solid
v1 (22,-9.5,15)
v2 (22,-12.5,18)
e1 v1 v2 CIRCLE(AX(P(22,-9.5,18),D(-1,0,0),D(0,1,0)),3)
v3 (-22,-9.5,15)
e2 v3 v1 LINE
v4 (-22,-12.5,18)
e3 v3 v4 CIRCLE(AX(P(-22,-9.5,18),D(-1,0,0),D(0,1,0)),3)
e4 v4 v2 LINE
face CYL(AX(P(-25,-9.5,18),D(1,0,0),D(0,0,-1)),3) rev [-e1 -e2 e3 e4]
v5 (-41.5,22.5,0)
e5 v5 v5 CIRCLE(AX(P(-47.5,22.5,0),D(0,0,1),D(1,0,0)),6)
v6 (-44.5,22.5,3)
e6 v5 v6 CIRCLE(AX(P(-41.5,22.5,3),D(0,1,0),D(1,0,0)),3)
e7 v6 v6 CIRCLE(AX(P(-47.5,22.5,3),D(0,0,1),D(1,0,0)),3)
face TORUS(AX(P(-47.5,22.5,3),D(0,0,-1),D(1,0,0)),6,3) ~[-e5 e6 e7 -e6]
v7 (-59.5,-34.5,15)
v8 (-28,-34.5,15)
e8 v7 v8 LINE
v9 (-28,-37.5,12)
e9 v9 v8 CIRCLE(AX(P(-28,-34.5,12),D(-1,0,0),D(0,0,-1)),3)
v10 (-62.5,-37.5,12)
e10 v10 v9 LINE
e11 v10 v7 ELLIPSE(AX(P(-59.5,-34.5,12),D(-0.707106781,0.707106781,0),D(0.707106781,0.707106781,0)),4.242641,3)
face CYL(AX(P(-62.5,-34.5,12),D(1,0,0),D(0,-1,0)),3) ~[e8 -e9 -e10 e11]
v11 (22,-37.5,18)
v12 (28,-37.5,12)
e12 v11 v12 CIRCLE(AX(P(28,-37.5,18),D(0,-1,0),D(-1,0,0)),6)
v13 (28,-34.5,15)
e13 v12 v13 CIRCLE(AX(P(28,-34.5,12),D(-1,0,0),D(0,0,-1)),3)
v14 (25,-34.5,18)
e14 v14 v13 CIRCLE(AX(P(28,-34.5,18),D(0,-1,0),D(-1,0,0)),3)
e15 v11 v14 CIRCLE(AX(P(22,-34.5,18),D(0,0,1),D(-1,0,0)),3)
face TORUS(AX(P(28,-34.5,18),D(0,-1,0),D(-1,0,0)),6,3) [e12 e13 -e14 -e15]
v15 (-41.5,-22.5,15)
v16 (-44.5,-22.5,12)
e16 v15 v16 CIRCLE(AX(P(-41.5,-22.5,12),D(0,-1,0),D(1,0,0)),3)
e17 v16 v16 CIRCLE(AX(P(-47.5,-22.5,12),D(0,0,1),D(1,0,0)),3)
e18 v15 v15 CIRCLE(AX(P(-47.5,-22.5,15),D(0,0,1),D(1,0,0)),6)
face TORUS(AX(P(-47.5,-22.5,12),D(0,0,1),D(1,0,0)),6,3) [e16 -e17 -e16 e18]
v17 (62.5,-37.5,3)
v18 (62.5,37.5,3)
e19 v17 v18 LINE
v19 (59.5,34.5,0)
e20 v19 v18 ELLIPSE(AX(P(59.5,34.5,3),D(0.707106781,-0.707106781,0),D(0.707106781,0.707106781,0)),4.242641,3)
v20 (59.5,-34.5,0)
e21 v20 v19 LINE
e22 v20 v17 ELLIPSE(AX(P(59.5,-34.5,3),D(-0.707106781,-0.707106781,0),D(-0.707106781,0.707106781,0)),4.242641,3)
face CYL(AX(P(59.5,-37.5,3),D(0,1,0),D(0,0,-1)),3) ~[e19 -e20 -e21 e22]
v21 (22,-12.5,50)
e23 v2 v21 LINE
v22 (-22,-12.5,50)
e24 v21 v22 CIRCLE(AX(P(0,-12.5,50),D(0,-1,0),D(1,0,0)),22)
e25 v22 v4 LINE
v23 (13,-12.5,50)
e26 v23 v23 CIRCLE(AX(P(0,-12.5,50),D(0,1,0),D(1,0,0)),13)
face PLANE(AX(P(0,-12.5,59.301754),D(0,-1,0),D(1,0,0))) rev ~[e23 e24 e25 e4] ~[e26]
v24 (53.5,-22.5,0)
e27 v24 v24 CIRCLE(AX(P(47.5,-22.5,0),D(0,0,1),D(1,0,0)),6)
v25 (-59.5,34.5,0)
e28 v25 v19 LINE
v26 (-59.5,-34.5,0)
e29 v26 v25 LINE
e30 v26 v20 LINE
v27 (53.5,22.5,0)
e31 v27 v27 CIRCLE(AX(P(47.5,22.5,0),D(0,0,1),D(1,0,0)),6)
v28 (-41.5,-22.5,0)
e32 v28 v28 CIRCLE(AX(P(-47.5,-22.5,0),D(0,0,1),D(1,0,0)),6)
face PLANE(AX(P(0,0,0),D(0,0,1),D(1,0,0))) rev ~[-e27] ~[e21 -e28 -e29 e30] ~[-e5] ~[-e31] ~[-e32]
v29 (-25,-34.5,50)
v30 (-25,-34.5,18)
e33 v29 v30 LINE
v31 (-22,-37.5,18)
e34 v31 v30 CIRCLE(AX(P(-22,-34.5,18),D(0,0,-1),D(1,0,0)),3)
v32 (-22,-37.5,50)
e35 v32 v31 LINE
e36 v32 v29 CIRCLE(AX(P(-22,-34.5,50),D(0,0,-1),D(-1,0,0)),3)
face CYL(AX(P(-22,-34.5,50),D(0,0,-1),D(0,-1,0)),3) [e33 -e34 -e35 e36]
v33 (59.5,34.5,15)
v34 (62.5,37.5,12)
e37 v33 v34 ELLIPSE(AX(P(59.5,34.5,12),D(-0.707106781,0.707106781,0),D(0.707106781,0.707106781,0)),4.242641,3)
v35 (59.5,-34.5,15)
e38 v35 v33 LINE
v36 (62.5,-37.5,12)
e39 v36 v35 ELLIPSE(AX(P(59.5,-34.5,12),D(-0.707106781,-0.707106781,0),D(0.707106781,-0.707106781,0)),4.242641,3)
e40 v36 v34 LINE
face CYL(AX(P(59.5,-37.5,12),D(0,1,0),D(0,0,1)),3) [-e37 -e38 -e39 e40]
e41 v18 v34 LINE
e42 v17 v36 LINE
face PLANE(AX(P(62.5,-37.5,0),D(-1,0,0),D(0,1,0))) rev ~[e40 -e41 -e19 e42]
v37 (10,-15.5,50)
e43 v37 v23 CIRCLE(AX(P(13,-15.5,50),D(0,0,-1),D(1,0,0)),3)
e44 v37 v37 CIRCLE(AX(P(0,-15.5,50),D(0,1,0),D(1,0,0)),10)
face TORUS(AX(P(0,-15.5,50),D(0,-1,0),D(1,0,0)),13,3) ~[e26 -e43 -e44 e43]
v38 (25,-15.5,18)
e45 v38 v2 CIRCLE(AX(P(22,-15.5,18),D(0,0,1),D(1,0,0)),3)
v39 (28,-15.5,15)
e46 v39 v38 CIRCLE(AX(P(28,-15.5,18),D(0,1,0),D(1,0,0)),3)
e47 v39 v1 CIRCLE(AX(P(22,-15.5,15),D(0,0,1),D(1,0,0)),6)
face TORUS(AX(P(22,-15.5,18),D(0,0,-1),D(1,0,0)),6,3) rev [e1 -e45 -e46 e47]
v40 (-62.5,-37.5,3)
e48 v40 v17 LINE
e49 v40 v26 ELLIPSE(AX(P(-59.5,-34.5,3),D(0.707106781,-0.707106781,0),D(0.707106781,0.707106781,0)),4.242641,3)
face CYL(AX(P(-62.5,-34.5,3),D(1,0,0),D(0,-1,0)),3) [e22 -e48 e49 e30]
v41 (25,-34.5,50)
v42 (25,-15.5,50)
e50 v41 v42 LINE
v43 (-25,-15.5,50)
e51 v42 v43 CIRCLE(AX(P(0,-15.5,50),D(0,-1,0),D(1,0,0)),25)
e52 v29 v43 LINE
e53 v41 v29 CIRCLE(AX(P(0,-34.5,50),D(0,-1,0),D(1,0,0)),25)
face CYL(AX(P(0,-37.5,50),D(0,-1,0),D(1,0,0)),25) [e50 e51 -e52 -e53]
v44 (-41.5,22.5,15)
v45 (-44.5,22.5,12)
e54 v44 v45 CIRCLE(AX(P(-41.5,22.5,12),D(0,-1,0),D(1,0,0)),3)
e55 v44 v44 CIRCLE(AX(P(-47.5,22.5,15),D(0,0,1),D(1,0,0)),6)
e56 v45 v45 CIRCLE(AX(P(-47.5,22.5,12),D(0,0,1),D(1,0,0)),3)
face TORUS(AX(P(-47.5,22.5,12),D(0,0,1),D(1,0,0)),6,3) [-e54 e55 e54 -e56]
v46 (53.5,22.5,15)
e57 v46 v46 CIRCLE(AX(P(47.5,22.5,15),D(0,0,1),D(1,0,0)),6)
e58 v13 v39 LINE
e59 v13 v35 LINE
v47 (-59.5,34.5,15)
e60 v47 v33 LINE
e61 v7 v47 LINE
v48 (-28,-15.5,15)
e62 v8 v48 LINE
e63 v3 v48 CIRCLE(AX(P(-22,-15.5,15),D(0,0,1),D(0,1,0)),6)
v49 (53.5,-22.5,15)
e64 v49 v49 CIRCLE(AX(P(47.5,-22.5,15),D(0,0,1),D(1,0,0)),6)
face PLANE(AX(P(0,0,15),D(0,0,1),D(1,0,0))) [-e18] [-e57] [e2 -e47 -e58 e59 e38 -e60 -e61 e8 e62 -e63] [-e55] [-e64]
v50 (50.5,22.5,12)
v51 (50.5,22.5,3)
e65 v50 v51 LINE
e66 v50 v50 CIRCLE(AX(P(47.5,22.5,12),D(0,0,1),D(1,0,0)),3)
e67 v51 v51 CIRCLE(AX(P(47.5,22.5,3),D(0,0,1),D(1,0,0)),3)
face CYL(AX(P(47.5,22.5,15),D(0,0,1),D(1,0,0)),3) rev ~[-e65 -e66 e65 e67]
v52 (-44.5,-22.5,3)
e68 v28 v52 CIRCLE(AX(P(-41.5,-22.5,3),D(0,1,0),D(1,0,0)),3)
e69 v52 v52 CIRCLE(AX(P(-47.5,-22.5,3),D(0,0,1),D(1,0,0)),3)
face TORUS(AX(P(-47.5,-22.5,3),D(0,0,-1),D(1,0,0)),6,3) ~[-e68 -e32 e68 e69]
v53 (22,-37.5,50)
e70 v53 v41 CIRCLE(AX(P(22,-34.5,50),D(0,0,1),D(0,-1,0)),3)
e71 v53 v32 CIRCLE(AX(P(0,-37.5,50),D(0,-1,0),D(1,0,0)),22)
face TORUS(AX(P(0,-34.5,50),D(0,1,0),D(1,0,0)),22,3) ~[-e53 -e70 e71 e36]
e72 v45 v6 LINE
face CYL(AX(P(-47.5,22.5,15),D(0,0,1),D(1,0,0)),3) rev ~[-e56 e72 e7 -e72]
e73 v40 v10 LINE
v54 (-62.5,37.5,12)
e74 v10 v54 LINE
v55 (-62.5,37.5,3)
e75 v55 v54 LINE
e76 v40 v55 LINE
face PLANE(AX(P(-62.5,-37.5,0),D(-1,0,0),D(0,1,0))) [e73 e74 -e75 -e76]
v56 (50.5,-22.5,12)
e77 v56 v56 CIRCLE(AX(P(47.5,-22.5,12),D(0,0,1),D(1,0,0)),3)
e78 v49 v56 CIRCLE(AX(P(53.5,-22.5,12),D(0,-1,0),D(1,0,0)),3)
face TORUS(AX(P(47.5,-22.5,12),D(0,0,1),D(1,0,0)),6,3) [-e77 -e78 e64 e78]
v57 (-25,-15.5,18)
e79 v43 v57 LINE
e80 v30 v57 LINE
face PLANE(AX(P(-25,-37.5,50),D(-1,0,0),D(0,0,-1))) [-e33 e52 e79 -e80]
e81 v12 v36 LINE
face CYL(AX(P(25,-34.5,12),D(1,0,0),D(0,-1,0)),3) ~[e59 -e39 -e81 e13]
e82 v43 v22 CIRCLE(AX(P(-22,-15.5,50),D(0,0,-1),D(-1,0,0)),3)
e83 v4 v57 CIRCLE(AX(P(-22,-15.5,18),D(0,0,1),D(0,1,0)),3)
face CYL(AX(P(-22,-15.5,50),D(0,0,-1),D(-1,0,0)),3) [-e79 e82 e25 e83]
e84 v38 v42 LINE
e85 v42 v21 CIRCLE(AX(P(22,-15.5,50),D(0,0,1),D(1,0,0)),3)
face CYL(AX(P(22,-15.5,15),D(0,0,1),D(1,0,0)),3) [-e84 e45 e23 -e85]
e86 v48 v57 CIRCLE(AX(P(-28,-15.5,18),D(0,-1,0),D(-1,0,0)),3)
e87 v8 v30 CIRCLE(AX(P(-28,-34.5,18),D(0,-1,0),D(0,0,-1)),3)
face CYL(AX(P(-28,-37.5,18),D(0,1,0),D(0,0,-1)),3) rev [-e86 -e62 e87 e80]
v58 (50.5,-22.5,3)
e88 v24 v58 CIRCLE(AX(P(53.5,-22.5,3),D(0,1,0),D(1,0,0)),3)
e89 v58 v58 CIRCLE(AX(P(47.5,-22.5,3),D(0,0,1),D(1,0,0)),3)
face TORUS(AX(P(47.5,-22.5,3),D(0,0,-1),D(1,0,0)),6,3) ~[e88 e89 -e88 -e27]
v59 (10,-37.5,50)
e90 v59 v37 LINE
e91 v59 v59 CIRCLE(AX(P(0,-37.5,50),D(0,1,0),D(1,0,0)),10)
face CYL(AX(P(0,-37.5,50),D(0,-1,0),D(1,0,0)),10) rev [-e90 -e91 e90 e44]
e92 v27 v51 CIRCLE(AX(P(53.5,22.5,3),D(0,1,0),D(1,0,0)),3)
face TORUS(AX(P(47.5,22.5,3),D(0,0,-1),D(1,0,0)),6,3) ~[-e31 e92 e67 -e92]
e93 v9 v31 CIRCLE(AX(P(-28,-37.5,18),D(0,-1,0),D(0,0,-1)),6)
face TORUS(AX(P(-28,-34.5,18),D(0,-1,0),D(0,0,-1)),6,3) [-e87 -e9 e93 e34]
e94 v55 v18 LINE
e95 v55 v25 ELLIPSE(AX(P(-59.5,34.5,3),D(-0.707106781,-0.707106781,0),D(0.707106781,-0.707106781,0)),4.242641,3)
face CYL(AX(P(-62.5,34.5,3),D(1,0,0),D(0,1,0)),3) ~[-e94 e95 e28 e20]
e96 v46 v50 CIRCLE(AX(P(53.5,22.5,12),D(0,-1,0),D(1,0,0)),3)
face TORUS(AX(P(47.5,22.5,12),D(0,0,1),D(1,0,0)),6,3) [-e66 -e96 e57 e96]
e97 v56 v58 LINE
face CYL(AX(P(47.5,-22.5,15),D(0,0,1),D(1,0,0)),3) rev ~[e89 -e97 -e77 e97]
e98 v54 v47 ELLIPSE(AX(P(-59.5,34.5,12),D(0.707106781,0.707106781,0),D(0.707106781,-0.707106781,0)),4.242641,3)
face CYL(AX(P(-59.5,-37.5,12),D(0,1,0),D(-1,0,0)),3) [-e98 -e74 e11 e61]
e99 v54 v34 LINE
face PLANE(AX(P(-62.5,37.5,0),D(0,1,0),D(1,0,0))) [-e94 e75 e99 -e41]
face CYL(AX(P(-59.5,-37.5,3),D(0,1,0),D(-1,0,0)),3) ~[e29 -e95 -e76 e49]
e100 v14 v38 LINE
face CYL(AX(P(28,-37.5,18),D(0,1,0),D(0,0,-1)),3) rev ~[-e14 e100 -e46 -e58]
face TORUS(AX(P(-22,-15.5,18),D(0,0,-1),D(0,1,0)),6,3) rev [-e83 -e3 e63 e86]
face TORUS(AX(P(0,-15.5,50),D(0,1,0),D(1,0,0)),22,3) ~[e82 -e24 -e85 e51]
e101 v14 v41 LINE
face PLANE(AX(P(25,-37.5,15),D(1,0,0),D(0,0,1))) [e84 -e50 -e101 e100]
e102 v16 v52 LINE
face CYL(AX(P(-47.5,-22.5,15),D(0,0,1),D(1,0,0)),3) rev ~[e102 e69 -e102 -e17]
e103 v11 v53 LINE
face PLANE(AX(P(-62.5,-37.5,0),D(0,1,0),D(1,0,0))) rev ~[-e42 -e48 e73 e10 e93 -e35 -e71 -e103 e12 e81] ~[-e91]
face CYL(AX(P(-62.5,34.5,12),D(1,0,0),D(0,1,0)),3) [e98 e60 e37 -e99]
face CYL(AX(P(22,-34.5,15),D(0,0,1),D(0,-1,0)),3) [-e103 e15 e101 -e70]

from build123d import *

# Parameters (mm, degrees)
F0_W     = 125
F0_H     = 75
F1_DEPTH = 15
F3_DEPTH = 25
F4_R     = 3
F5_DEPTH = 15
F6_R     = 3


with BuildPart() as f1:
    # F0 (on Top) → F1 (new body)
    with BuildSketch(Plane.XY):
        Rectangle(F0_W, F0_H)
    extrude(amount=F1_DEPTH)

    # F2 (on face) → F3 (join)
    with BuildSketch(Plane.XZ.offset(37.5)):
        with BuildLine():
            Line((10, 50), (25, 50))
            ThreePointArc((25, 50), (0, 75), (-25, 50))
            Line((-25, 50), (-10, 50))
            ThreePointArc((-10, 50), (0, 60), (10, 50))
        make_face()
        with BuildLine():
            Line((-25, 15), (25, 15))
            Line((25, 15), (25, 50))
            ThreePointArc((25, 50), (0, 25), (-25, 50))
            Line((-25, 50), (-25, 15))
        make_face()
        with BuildLine():
            ThreePointArc((-25, 50), (0, 25), (25, 50))
            Line((25, 50), (10, 50))
            ThreePointArc((10, 50), (0, 40), (-10, 50))
            Line((-10, 50), (-25, 50))
        make_face()
    extrude(amount=-F3_DEPTH)

    # F4 (on face) → F5 (cut, through all)
    with BuildSketch(Plane.XY.offset(15)):
        with Locations((-47.5, -22.5)):
            Circle(F4_R)
        with Locations((47.5, 22.5)):
            Circle(F4_R)
        with Locations((47.5, -22.5)):
            Circle(F4_R)
        with Locations((-47.5, 22.5)):
            Circle(F4_R)
    extrude(amount=-F5_DEPTH, mode=Mode.SUBTRACT)

    # F6
    f6_edges = [f1.edges().sort_by_distance(p)[0] for p in [
        (43.75, -37.5, 15),
        (25, -25, 15),
        (62.5, 0, 15),
        (0, -12.5, 15),
        (0, 37.5, 15),
        (-25, -25, 15),
        (-62.5, 0, 15),
        (-43.75, -37.5, 15),
        (-50.5, -22.5, 15),
        (44.5, -22.5, 15),
        (-50.5, 22.5, 15),
        (44.5, 22.5, 15),
        (-10, -12.5, 50),
        (0, -12.5, 75),
        (-25, -12.5, 32.5),
        (25, -12.5, 32.5),
        (62.5, 0, 0),
        (0, -37.5, 0),
        (0, 37.5, 0),
        (-62.5, 0, 0),
        (-50.5, -22.5, 0),
        (44.5, -22.5, 0),
        (-50.5, 22.5, 0),
        (44.5, 22.5, 0),
        (-25, -37.5, 32.5),
        (0, -37.5, 75),
        (25, -37.5, 32.5),
    ]]
    fillet(f6_edges, radius=F6_R)


solid = f1.part
